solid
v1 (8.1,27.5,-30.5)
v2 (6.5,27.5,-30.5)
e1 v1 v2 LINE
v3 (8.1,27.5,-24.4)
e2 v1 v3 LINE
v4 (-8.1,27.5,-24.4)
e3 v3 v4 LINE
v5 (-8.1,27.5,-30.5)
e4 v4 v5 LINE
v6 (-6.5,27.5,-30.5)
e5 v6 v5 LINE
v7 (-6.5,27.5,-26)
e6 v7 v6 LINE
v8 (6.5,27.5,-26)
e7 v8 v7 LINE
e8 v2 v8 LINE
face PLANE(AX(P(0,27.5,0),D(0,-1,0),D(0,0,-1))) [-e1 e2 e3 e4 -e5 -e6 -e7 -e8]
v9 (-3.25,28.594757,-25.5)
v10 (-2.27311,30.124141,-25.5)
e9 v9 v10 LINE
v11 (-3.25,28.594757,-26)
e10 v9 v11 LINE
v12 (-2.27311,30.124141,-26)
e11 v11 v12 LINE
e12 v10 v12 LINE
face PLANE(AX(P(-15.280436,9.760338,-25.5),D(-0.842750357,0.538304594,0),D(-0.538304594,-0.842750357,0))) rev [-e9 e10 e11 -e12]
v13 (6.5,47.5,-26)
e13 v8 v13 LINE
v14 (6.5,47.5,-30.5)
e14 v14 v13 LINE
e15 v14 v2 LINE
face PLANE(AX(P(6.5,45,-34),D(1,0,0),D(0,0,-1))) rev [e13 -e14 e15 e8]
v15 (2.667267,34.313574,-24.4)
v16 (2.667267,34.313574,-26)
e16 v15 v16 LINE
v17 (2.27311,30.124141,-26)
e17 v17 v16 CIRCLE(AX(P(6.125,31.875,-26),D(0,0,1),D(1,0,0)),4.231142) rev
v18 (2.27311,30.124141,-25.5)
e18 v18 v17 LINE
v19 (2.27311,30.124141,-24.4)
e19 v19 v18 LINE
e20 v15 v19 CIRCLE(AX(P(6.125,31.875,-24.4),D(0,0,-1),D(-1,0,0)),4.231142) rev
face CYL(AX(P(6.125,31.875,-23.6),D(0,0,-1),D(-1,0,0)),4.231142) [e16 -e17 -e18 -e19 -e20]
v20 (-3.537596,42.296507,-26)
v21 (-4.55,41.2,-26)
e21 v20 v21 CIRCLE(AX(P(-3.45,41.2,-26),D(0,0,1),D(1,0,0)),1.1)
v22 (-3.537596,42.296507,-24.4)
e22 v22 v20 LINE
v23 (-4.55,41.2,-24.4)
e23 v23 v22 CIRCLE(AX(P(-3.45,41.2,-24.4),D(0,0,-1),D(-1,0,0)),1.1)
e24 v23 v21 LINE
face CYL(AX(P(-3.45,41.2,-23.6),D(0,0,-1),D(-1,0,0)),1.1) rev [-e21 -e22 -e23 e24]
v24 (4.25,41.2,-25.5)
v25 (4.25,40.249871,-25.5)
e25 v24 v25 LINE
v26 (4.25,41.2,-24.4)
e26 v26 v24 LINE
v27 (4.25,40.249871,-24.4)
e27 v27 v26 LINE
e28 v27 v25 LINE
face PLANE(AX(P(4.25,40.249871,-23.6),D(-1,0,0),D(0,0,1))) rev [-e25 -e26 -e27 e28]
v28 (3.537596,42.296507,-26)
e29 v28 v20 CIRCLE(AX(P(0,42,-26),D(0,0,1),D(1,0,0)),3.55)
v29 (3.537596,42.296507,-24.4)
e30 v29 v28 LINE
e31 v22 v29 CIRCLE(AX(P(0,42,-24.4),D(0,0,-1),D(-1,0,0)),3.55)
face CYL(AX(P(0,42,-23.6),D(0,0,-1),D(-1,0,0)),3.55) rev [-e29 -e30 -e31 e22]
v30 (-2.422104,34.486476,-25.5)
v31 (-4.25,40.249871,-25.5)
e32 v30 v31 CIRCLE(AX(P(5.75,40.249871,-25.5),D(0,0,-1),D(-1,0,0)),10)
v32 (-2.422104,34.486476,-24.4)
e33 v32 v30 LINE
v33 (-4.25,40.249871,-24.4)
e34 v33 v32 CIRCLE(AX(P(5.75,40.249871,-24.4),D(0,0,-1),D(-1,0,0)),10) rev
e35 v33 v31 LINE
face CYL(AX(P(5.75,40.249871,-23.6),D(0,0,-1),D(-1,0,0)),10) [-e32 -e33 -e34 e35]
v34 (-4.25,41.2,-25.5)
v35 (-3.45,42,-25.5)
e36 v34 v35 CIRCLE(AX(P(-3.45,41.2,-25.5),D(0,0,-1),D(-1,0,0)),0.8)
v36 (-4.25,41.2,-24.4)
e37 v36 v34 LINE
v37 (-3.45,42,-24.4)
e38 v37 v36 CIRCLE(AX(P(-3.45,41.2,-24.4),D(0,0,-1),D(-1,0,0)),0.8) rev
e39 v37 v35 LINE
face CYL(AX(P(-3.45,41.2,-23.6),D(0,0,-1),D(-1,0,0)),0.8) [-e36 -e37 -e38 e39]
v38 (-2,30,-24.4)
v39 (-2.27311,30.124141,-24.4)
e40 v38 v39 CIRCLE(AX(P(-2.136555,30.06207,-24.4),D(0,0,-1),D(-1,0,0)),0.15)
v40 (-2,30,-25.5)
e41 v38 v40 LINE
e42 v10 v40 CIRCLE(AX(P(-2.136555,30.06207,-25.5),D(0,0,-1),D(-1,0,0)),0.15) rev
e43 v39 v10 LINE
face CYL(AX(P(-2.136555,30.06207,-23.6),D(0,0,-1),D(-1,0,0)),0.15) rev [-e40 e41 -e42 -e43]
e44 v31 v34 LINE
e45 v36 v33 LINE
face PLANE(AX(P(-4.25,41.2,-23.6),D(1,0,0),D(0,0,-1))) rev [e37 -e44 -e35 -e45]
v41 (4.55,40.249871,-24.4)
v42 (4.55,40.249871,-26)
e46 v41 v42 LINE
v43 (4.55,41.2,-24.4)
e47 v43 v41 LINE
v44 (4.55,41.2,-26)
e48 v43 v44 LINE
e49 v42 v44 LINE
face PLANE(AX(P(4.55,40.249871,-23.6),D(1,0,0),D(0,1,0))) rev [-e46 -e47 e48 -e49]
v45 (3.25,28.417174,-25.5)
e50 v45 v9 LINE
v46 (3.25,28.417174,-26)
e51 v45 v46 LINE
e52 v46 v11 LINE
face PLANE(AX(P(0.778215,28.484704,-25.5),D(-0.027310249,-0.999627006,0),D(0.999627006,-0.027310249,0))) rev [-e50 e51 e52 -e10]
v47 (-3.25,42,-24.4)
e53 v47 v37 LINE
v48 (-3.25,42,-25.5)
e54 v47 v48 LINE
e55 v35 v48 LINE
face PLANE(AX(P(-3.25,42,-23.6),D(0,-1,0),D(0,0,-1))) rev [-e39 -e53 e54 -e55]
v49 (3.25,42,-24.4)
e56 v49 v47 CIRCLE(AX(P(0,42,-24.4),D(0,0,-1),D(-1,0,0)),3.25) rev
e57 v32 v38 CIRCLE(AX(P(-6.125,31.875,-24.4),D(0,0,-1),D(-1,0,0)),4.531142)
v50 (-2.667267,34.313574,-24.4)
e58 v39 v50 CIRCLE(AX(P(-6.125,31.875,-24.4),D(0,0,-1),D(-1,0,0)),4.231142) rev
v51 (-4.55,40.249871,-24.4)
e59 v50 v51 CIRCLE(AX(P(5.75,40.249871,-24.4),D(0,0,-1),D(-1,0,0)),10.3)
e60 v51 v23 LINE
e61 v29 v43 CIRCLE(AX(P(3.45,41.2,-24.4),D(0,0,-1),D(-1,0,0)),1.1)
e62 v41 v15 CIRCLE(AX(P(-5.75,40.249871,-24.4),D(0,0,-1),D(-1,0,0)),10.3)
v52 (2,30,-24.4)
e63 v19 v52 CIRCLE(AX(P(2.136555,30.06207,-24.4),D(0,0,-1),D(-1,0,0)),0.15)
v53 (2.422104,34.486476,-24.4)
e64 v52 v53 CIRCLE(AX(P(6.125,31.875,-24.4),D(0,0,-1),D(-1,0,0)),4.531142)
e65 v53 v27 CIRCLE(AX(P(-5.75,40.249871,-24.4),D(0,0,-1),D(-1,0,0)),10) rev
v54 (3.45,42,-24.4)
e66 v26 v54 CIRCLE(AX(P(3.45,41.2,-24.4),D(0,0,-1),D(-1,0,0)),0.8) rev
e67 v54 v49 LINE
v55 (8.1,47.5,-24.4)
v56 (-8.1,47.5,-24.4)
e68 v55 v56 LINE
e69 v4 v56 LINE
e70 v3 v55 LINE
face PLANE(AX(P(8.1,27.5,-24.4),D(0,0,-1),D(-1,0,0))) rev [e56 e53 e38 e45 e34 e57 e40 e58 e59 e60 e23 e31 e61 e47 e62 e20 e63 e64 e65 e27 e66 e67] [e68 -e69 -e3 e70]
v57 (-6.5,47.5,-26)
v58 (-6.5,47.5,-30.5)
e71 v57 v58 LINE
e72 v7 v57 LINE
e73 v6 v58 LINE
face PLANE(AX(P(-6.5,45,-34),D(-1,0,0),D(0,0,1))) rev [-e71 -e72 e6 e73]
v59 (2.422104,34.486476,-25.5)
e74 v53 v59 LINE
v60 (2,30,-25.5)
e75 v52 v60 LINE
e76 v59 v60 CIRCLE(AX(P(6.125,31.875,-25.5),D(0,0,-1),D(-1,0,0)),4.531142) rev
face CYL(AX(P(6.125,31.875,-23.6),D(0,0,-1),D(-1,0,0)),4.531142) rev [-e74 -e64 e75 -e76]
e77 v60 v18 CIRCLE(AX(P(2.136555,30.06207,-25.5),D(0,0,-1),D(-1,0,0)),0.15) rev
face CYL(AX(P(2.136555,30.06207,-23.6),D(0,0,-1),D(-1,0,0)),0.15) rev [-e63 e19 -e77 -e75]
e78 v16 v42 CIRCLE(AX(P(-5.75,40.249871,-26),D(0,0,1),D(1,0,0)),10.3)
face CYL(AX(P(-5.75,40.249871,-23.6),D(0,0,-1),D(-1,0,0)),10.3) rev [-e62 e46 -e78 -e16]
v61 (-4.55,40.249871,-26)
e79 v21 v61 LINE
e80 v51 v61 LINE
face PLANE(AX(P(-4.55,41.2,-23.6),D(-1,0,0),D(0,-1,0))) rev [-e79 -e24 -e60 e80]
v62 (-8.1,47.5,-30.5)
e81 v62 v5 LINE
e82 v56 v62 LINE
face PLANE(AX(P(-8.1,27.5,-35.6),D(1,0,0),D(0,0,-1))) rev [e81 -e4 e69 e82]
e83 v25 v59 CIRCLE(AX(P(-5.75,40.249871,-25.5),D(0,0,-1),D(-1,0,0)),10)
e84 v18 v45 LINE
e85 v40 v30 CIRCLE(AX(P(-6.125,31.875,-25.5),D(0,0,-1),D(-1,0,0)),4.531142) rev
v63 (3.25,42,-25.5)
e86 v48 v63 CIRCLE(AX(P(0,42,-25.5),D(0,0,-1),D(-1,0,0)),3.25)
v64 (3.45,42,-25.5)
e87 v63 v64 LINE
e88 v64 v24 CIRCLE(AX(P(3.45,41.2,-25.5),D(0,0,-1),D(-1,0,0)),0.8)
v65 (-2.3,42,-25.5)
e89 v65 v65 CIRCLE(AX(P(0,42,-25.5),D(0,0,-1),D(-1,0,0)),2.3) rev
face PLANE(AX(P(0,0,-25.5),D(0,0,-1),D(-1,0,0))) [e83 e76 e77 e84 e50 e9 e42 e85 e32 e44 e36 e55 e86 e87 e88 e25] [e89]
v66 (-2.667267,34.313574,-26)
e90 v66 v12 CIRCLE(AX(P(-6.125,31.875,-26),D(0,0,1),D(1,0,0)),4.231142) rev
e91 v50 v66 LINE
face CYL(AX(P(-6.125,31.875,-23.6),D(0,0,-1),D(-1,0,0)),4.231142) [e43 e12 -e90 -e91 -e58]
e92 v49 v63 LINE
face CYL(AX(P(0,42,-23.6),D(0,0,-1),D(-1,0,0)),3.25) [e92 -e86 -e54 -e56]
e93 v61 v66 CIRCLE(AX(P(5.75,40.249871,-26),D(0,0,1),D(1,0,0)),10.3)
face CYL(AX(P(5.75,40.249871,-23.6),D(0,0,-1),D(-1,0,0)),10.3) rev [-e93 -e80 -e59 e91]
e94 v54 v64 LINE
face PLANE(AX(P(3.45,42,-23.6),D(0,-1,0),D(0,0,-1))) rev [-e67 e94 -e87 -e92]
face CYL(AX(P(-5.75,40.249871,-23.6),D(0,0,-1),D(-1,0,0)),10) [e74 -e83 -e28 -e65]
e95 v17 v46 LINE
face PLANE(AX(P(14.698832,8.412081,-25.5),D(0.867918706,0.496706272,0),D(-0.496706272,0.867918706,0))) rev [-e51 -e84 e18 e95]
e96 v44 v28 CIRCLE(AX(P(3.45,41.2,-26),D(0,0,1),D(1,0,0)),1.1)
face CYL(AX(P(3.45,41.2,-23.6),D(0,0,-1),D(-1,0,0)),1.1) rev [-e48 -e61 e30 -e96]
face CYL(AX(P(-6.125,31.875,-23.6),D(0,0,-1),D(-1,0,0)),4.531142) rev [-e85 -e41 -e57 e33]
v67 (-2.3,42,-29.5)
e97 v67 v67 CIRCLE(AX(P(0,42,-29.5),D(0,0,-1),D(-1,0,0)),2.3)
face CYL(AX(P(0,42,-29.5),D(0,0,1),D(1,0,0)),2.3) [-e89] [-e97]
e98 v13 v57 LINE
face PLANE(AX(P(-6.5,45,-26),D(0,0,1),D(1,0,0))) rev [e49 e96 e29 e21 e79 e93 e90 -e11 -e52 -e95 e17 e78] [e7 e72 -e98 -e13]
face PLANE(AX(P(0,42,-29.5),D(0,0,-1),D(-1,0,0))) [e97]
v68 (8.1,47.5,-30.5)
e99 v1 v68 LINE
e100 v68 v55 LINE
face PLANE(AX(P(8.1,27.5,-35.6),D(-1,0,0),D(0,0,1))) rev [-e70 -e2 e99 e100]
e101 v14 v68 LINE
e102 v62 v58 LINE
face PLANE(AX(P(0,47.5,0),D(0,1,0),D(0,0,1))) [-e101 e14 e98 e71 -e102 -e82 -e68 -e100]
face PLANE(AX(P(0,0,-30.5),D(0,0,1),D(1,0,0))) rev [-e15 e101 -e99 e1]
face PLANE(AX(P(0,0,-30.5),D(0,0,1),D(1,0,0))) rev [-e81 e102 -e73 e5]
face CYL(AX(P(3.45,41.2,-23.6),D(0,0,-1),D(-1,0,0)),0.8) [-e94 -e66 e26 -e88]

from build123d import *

# Parameters (mm, degrees)
CUT_EXTRUDE1_DEPTH     = 5
CUT_EXTRUDE3_DEPTH     = 45
SKETCH8_R              = 40
CUT_EXTRUDE4_DEPTH     = 32
FILLET1_R              = 7
FILLET2_R              = 8
CUT_REVOLVE1_START     = 17
CUT_REVOLVE1_DEPTH     = 30.5
SKETCH18_W             = 13
SKETCH18_H             = 8
CUT_EXTRUDE13_DEPTH    = 5
SKETCH20_W             = 84
SKETCH20_H             = 7
CUT_EXTRUDE15_DEPTH    = 5
SKETCH19_R             = 1.5
CUT_EXTRUDE14_DEPTH    = 12
FILLET3_R              = 4
SKETCH21_W             = 16
SKETCH21_H             = 5
CUT_EXTRUDE16_DEPTH    = 5
CIRPATTERN1_COUNT      = 4
SKETCH22_W             = 5
SKETCH22_H             = 12
BOSS_EXTRUDE1_DEPTH    = 1.5
SKETCH23_W             = 5
SKETCH23_H             = 4.4
SKETCH23_H_2           = 4
BOSS_EXTRUDE2_DEPTH    = 17
SKETCH24_W             = 2
SKETCH24_H             = 3
BOSS_EXTRUDE3_DEPTH    = 2
CIRPATTERN2_COUNT      = 5
CUT_REVOLVE2_START     = 17
CUT_REVOLVE2_DEPTH     = 30.5
SKETCH29_W             = 16.2
SKETCH29_H             = 11.2
SKETCH29_W_2           = 13
SKETCH29_H_2           = 8
BOSS_EXTRUDE4_DEPTH    = 20
CUT_EXTRUDE18_DEPTH    = 12
SKETCH34_R             = 2.3
BOSS_EXTRUDE5_DEPTH    = 3.5
BOSS_EXTRUDE6_START    = 3.5
SKETCH35_R             = 2.3
BOSS_EXTRUDE6_DEPTH    = 3.5
SKETCH36_W             = 2
SKETCH36_H             = 2
BOSS_EXTRUDE7_DEPTH    = 5
SKETCH37_W             = 2
SKETCH37_H             = 2
BOSS_EXTRUDE8_DEPTH    = 12.5
SKETCH40_W             = 2
SKETCH40_H             = 2
BOSS_EXTRUDE9_DEPTH    = 5
INTERSECT5_OUTLINE_R   = 42
INTERSECT5_DEPTH       = 55
INTERSECT5_2_OUTLINE_W = 16
INTERSECT5_2_OUTLINE_H = 5
INTERSECT5_2_DEPTH     = 15.5
INTERSECT5_START       = 47.5
INTERSECT5_3_OUTLINE_W = 13
INTERSECT5_3_OUTLINE_H = 8
INTERSECT5_3_DEPTH     = 2.5
INTERSECT6_START       = -35.6
INTERSECT6_OUTLINE_W   = 16.2
INTERSECT6_OUTLINE_H   = 20
INTERSECT6_DEPTH       = 5.1
SKETCH46_R             = 2.3
CUT_EXTRUDE20_DEPTH    = 0.5


# Read off the part's stored shape, not the designer's step: Cut-Revolve1, Cut-Revolve2, Intersect5, Intersect6
with BuildPart() as part:
    # Sketch1 → Revolve1 (revolve)
    with BuildSketch(Plane.XY, mode=Mode.PRIVATE) as revolve1_sk:
        with BuildLine():
            Line((37, 55), (0, 55))
            Line((0, 55), (0, 11.5))
            Line((0, 11.5), (22.5, 11.5))
            Line((22.5, 11.5), (22.5, 0))
            Line((22.5, 0), (25, 0))
            Line((25, 0), (25, 11.5))
            Line((25, 11.5), (42, 11.5))
            Line((42, 11.5), (42, 50))
            ThreePointArc((42, 50), (40.535533906, 53.535533906), (37, 55))
        make_face()
    revolve(revolve1_sk.sketch.rotate(Axis((0, 2, 0), (0, 1, 0)), 90), axis=Axis((0, 2, 0), (0, 1, 0)))

    # Sketch5 → Cut-Extrude1 (cut)
    with BuildSketch(Plane(origin=(0, 55, 0), x_dir=(1, 0, 0), z_dir=(0, 1, 0))):
        with BuildLine():
            Line((-42, 0), (-40, 0))
            Line((-40, 0), (40, 0))
            Line((40, 0), (42, 0))
            ThreePointArc((42, 0), (0, 42), (-42, 0))
        make_face()
    extrude(amount=-CUT_EXTRUDE1_DEPTH, mode=Mode.SUBTRACT)

    # Sketch7 → Cut-Extrude3 (cut)
    with BuildSketch(Plane.XZ.offset(-11.5)):
        with BuildLine():
            Line((-21, 0), (21, 0))
            ThreePointArc((21, 0), (0, -21), (-21, 0))
        make_face()
    extrude(amount=-CUT_EXTRUDE3_DEPTH, mode=Mode.SUBTRACT)

    # Sketch8 → Cut-Extrude4 (cut)
    with BuildSketch(Plane(origin=(0, 47.5, 0), x_dir=(1, 0, 0), z_dir=(0, 1, 0))):
        with Locations(Location((0, 0, 0), (0, 0, 270))):
            Circle(SKETCH8_R)
        with BuildLine():
            Line((22.912878475, -2), (-22.912878475, -2))
            ThreePointArc((-22.912878475, -2), (0, 23), (22.912878475, -2))
        make_face(mode=Mode.SUBTRACT)
    extrude(amount=-CUT_EXTRUDE4_DEPTH, mode=Mode.SUBTRACT)

    # Fillet1
    fillet1_edges = [part.edges().sort_by_distance(p)[0] for p in [
        (21, 30.75, 0),
        (-21, 30.75, 0),
    ]]
    fillet(fillet1_edges, radius=FILLET1_R)

    # Fillet2
    fillet2_edges = [part.edges().sort_by_distance(p)[0] for p in [
        (-22.912878475, 31.5, 2),
        (22.912878475, 31.5, 2),
    ]]
    fillet(fillet2_edges, radius=FILLET2_R)

    # Cut-Revolve1 outline → Cut-Revolve1 (cut)
    with BuildSketch(Plane(origin=(0, 0, 0), x_dir=(1, 0, 0), z_dir=(0, 1, 0)).offset(CUT_REVOLVE1_START)):
        with BuildLine():
            Line((-34.641016151, -20), (-36.373066959, -21))
            ThreePointArc((-36.373066959, -21), (0, -42), (36.373066959, -21))
            Line((36.373066959, -21), (34.641016151, -20))
            ThreePointArc((34.641016151, -20), (0, -40), (-34.641016151, -20))
        make_face()
    extrude(amount=CUT_REVOLVE1_DEPTH, mode=Mode.SUBTRACT)

    # Sketch18 → Cut-Extrude13 (cut)
    with BuildSketch(Plane(origin=(0, 50, 0), x_dir=(1, 0, 0), z_dir=(0, 1, 0))):
        with Locations((0, 30)):
            Rectangle(SKETCH18_W, SKETCH18_H)
    extrude(amount=-CUT_EXTRUDE13_DEPTH, mode=Mode.SUBTRACT)

    # Sketch20 → Cut-Extrude15 (cut)
    with BuildSketch(Plane(origin=(0, 55, 0), x_dir=(1, 0, 0), z_dir=(0, 1, 0))):
        with Locations((0, -3.5)):
            Rectangle(SKETCH20_W, SKETCH20_H)
    extrude(amount=-CUT_EXTRUDE15_DEPTH, mode=Mode.SUBTRACT)

    # Sketch19 → Cut-Extrude14 (cut)
    with BuildSketch(Plane(origin=(0, 0, 7), x_dir=(-1, 0, 0), z_dir=(0, 0, -1))):
        with Locations((0, 52.5)):
            Circle(SKETCH19_R)
        with Locations((-29.412558482, 52.5)):
            Circle(SKETCH19_R)
        with Locations((29.412558482, 52.5)):
            Circle(SKETCH19_R)
    extrude(amount=-CUT_EXTRUDE14_DEPTH, mode=Mode.SUBTRACT)

    # Fillet3
    fillet3_edges = [part.edges().sort_by_distance(p)[0] for p in [
        (0, 11.5, 42),
    ]]
    fillet(fillet3_edges, radius=FILLET3_R)

    # Sketch21 → Cut-Extrude16 (cut)
    with BuildSketch(Plane(origin=(0, 15.5, 0), x_dir=(1, 0, 0), z_dir=(0, 1, 0))):
        with Locations((0, -29.5)):
            Rectangle(SKETCH21_W, SKETCH21_H)
    cut_extrude16 = extrude(amount=-CUT_EXTRUDE16_DEPTH, mode=Mode.SUBTRACT)

    # CirPattern1: Cut-Extrude16 ×4 about axis
    cirpattern1_axis = Axis((0, 0, 0), (0, 1, 0))
    for i in range(1, CIRPATTERN1_COUNT):
        add(cut_extrude16.rotate(cirpattern1_axis, i * 360 / CIRPATTERN1_COUNT), mode=Mode.SUBTRACT)

    # Sketch22 → Boss-Extrude1 (add)
    with BuildSketch(Plane(origin=(0, 15.5, 0), x_dir=(1, 0, 0), z_dir=(0, 1, 0))):
        with Locations((35.5, -4)):
            Rectangle(SKETCH22_W, SKETCH22_H)
    extrude(amount=BOSS_EXTRUDE1_DEPTH)

    # Sketch23 → Boss-Extrude2 (add)
    with BuildSketch(Plane(origin=(0, 17, 0), x_dir=(1, 0, 0), z_dir=(0, 1, 0))):
        with Locations((35.5, -0.2)):
            Rectangle(SKETCH23_W, SKETCH23_H)
        with Locations((35.5, -8)):
            Rectangle(SKETCH23_W, SKETCH23_H_2)
    extrude(amount=BOSS_EXTRUDE2_DEPTH)

    # Sketch24 → Boss-Extrude3 (add)
    with BuildSketch(Plane.XZ):
        with Locations((0, -22.5)):
            Rectangle(SKETCH24_W, SKETCH24_H)
    boss_extrude3 = extrude(amount=-BOSS_EXTRUDE3_DEPTH)

    # CirPattern2: Boss-Extrude3 ×5 about axis
    cirpattern2_axis = Axis((0, 0, 0), (0, 1, 0))
    for i in range(1, CIRPATTERN2_COUNT):
        add(boss_extrude3.rotate(cirpattern2_axis, i * 360 / CIRPATTERN2_COUNT))

    # Cut-Revolve2 outline → Cut-Revolve2 (cut)
    with BuildSketch(Plane(origin=(0, 0, 0), x_dir=(1, 0, 0), z_dir=(0, 1, 0)).offset(CUT_REVOLVE2_START)):
        with BuildLine():
            ThreePointArc((-30.641777725, 25.711504387), (0, 40), (30.641777725, 25.711504387))
            Line((30.641777725, 25.711504387), (32.173866611, 26.997079607))
            ThreePointArc((32.173866611, 26.997079607), (0, 42), (-32.173866611, 26.997079607))
            Line((-32.173866611, 26.997079607), (-30.641777725, 25.711504387))
        make_face()
    extrude(amount=CUT_REVOLVE2_DEPTH, mode=Mode.SUBTRACT)

    # Sketch29 → Boss-Extrude4 (add)
    with BuildSketch(Plane.XZ.offset(-47.5)):
        with Locations((0, -30)):
            Rectangle(SKETCH29_W, SKETCH29_H)
        with Locations((0, -30)):
            Rectangle(SKETCH29_W_2, SKETCH29_H_2, mode=Mode.SUBTRACT)
    extrude(amount=BOSS_EXTRUDE4_DEPTH)

    # Sketch32 → Cut-Extrude18 (cut)
    with BuildSketch(Plane(origin=(0, 0, -35.6), x_dir=(-1, 0, 0), z_dir=(0, 0, -1))):
        with BuildLine():
            Line((-4.55, 40.24987133), (-4.55, 41.2))
            ThreePointArc((-4.55, 41.2), (-4.258194078, 41.946205288), (-3.537595761, 42.296506718))
            ThreePointArc((-3.537595761, 42.296506718), (0, 45.55), (3.537595761, 42.296506718))
            ThreePointArc((3.537595761, 42.296506718), (4.258194078, 41.946205288), (4.55, 41.2))
            Line((4.55, 41.2), (4.55, 40.24987133))
            ThreePointArc((4.55, 40.24987133), (4.068040722, 37.136018992), (2.667266721, 34.313574426))
            ThreePointArc((2.667266721, 34.313574426), (1.91246078, 32.271330642), (2.273109943, 30.124140883))
            ThreePointArc((2.273109943, 30.124140883), (2.198625413, 29.92551547), (2, 30))
            ThreePointArc((2, 30), (1.613779787, 32.29943161), (2.422103613, 34.486476277))
            ThreePointArc((2.422103613, 34.486476277), (3.782078371, 37.22671372), (4.25, 40.24987133))
            Line((4.25, 40.24987133), (4.25, 41.2))
            ThreePointArc((4.25, 41.2), (4.015685425, 41.765685425), (3.45, 42))
            Line((3.45, 42), (3.25, 42))
            ThreePointArc((3.25, 42), (0, 45.25), (-3.25, 42))
            Line((-3.25, 42), (-3.45, 42))
            ThreePointArc((-3.45, 42), (-4.015685425, 41.765685425), (-4.25, 41.2))
            Line((-4.25, 41.2), (-4.25, 40.24987133))
            ThreePointArc((-4.25, 40.24987133), (-3.782078371, 37.22671372), (-2.422103613, 34.486476277))
            ThreePointArc((-2.422103613, 34.486476277), (-1.613779787, 32.29943161), (-2, 30))
            ThreePointArc((-2, 30), (-2.198625413, 29.92551547), (-2.273109943, 30.124140883))
            ThreePointArc((-2.273109943, 30.124140883), (-1.91246078, 32.271330642), (-2.667266721, 34.313574426))
            ThreePointArc((-2.667266721, 34.313574426), (-4.068040722, 37.136018992), (-4.55, 40.24987133))
        make_face()
    extrude(amount=-CUT_EXTRUDE18_DEPTH, mode=Mode.SUBTRACT)

    # Sketch34 → Boss-Extrude5 (add)
    with BuildSketch(Plane.XY.offset(-34)):
        with Locations(Location((0, 42, 0), (0, 0, 180))):
            Circle(SKETCH34_R)
    extrude(amount=BOSS_EXTRUDE5_DEPTH)

    # Sketch35 → Boss-Extrude6 (add)
    with BuildSketch(Plane(origin=(0, 0, -26), x_dir=(-1, 0, 0), z_dir=(0, 0, -1)).offset(BOSS_EXTRUDE6_START)):
        with Locations((0, 42)):
            Circle(SKETCH35_R)
    extrude(amount=-BOSS_EXTRUDE6_DEPTH)

    # Sketch36 → Boss-Extrude7 (add)
    with BuildSketch(Plane(origin=(0, 0, -35.6), x_dir=(-1, 0, 0), z_dir=(0, 0, -1))):
        with Locations((-6.159647943, 37.918102195)):
            Rectangle(SKETCH36_W, SKETCH36_H)
    extrude(amount=BOSS_EXTRUDE7_DEPTH)

    # Sketch37 → Boss-Extrude8 (add)
    with BuildSketch(Plane.ZY.offset(-5.159647943)):
        with Locations((-39.597351245, 37.918102195)):
            Rectangle(SKETCH37_W, SKETCH37_H)
    extrude(amount=BOSS_EXTRUDE8_DEPTH)

    # Sketch40 → Boss-Extrude9 (add)
    with BuildSketch(Plane(origin=(0, 0, -35.6), x_dir=(-1, 0, 0), z_dir=(0, 0, -1))):
        with Locations((6.340352057, 37.918102195)):
            Rectangle(SKETCH40_W, SKETCH40_H)
    extrude(amount=BOSS_EXTRUDE9_DEPTH)

    # Intersect5 outline → Intersect5 (cut)
    with BuildSketch(Plane(origin=(0, 0, 0), x_dir=(1, 0, 0), z_dir=(0, 1, 0))):
        Circle(INTERSECT5_OUTLINE_R)
        with BuildLine():
            Line((-7.340352057, 39.320722675), (-7.340352057, 35.6))
            Line((-7.340352057, 35.6), (7.159647943, 35.6))
            Line((7.159647943, 35.6), (7.159647943, 39.354027003))
            ThreePointArc((7.159647943, 39.354027003), (32.84390905, 22.831505389), (39.382737335, -7))
            Line((39.382737335, -7), (38, -7))
            Line((38, -7), (38, 2))
            Line((38, 2), (33, 2))
            Line((33, 2), (33, -7))
            Line((33, -7), (32, -7))
            Line((32, -7), (32, 8))
            Line((32, 8), (27, 8))
            Line((27, 8), (27, -7))
            Line((27, -7), (21.38340478, -7))
            ThreePointArc((21.38340478, -7), (22.491014191, -0.635830699), (21.744722088, 5.780749199))
            ThreePointArc((21.744722088, 5.780749199), (21.600641781, 7.527000579), (21.079848197, 9.2))
            ThreePointArc((21.079848197, 9.2), (0, 23), (-21.079848197, 9.2))
            ThreePointArc((-21.079848197, 9.2), (-21.600641781, 7.527000579), (-21.744722088, 5.780749199))
            ThreePointArc((-21.744722088, 5.780749199), (-22.491014191, -0.635830699), (-21.38340478, -7))
            Line((-21.38340478, -7), (-27, -7))
            Line((-27, -7), (-27, 8))
            Line((-27, 8), (-32, 8))
            Line((-32, 8), (-32, -7))
            Line((-32, -7), (-39.382737335, -7))
            ThreePointArc((-39.382737335, -7), (-32.896262825, 22.756007825), (-7.340352057, 39.320722675))
        make_face(mode=Mode.SUBTRACT)
        with BuildLine():
            Line((12.124355653, 0), (-12.124355653, 0))
            ThreePointArc((-12.124355653, 0), (-18.186533479, 3.5), (-18.186533479, 10.5))
            ThreePointArc((-18.186533479, 10.5), (0, 21), (18.186533479, 10.5))
            ThreePointArc((18.186533479, 10.5), (18.186533479, 3.5), (12.124355653, 0))
        make_face(mode=Mode.SUBTRACT)
    extrude(amount=INTERSECT5_DEPTH, mode=Mode.SUBTRACT)

    # Intersect5 2 outline → Intersect5 2 (cut)
    with BuildSketch(Plane(origin=(0, 0, 0), x_dir=(1, 0, 0), z_dir=(0, 1, 0))):
        with BuildLine():
            Line((-7.340352057, 35.6), (-7.340352057, 39.320722675))
            ThreePointArc((-7.340352057, 39.320722675), (-32.896262825, 22.756007825), (-39.382737335, -7))
            Line((-39.382737335, -7), (-32, -7))
            Line((-32, -7), (-32, 8))
            Line((-32, 8), (-27, 8))
            Line((-27, 8), (-27, -7))
            Line((-27, -7), (-21.38340478, -7))
            ThreePointArc((-21.38340478, -7), (-22.491014191, -0.635830699), (-21.744722088, 5.780749199))
            ThreePointArc((-21.744722088, 5.780749199), (-21.600641781, 7.527000579), (-21.079848197, 9.2))
            ThreePointArc((-21.079848197, 9.2), (0, 23), (21.079848197, 9.2))
            ThreePointArc((21.079848197, 9.2), (21.600641781, 7.527000579), (21.744722088, 5.780749199))
            ThreePointArc((21.744722088, 5.780749199), (22.491014191, -0.635830699), (21.38340478, -7))
            Line((21.38340478, -7), (27, -7))
            Line((27, -7), (27, 8))
            Line((27, 8), (32, 8))
            Line((32, 8), (32, -7))
            Line((32, -7), (33, -7))
            Line((33, -7), (33, 2))
            Line((33, 2), (38, 2))
            Line((38, 2), (38, -7))
            Line((38, -7), (39.382737335, -7))
            ThreePointArc((39.382737335, -7), (32.84390905, 22.831505389), (7.159647943, 39.354027003))
            Line((7.159647943, 39.354027003), (7.159647943, 35.6))
            Line((7.159647943, 35.6), (-7.340352057, 35.6))
        make_face()
        with Locations((0, 29.5)):
            Rectangle(INTERSECT5_2_OUTLINE_W, INTERSECT5_2_OUTLINE_H, mode=Mode.SUBTRACT)
    extrude(amount=INTERSECT5_2_DEPTH, mode=Mode.SUBTRACT)

    # Intersect5 3 outline → Intersect5 3 (cut)
    with BuildSketch(Plane(origin=(0, 0, 0), x_dir=(1, 0, 0), z_dir=(0, 1, 0)).offset(INTERSECT5_START)):
        with BuildLine():
            Line((-7.340352057, 35.6), (-7.340352057, 39.320722675))
            ThreePointArc((-7.340352057, 39.320722675), (-32.896262825, 22.756007825), (-39.382737335, -7))
            Line((-39.382737335, -7), (-32, -7))
            Line((-32, -7), (-32, 8))
            Line((-32, 8), (-27, 8))
            Line((-27, 8), (-27, -7))
            Line((-27, -7), (-21.38340478, -7))
            ThreePointArc((-21.38340478, -7), (-22.491014191, -0.635830699), (-21.744722088, 5.780749199))
            ThreePointArc((-21.744722088, 5.780749199), (-21.600641781, 7.527000579), (-21.079848197, 9.2))
            ThreePointArc((-21.079848197, 9.2), (0, 23), (21.079848197, 9.2))
            ThreePointArc((21.079848197, 9.2), (21.600641781, 7.527000579), (21.744722088, 5.780749199))
            ThreePointArc((21.744722088, 5.780749199), (22.491014191, -0.635830699), (21.38340478, -7))
            Line((21.38340478, -7), (27, -7))
            Line((27, -7), (27, 8))
            Line((27, 8), (32, 8))
            Line((32, 8), (32, -7))
            Line((32, -7), (33, -7))
            Line((33, -7), (33, 2))
            Line((33, 2), (38, 2))
            Line((38, 2), (38, -7))
            Line((38, -7), (39.382737335, -7))
            ThreePointArc((39.382737335, -7), (32.84390905, 22.831505389), (7.159647943, 39.354027003))
            Line((7.159647943, 39.354027003), (7.159647943, 35.6))
            Line((7.159647943, 35.6), (-7.340352057, 35.6))
        make_face()
        with Locations((0, 30)):
            Rectangle(INTERSECT5_3_OUTLINE_W, INTERSECT5_3_OUTLINE_H, mode=Mode.SUBTRACT)
    extrude(amount=INTERSECT5_3_DEPTH, mode=Mode.SUBTRACT)

    # Intersect6 outline → Intersect6 (cut)
    with BuildSketch(Plane.XY.offset(INTERSECT6_START)):
        with Locations((0, 37.5)):
            Rectangle(INTERSECT6_OUTLINE_W, INTERSECT6_OUTLINE_H)
        with BuildLine():
            ThreePointArc((4.25, 41.2), (4.015685425, 41.765685425), (3.45, 42))
            Line((3.45, 42), (3.25, 42))
            ThreePointArc((3.25, 42), (0, 45.25), (-3.25, 42))
            Line((-3.25, 42), (-3.45, 42))
            ThreePointArc((-3.45, 42), (-4.015685425, 41.765685425), (-4.25, 41.2))
            Line((-4.25, 41.2), (-4.25, 40.24987133))
            ThreePointArc((-4.25, 40.24987133), (-3.782078371, 37.22671372), (-2.422103613, 34.486476277))
            ThreePointArc((-2.422103613, 34.486476277), (-1.613779787, 32.29943161), (-2, 30))
            ThreePointArc((-2, 30), (-2.198625413, 29.92551547), (-2.273109943, 30.124140883))
            ThreePointArc((-2.273109943, 30.124140883), (-1.91246078, 32.271330642), (-2.667266721, 34.313574426))
            ThreePointArc((-2.667266721, 34.313574426), (-4.068040722, 37.136018992), (-4.55, 40.24987133))
            Line((-4.55, 40.24987133), (-4.55, 41.2))
            ThreePointArc((-4.55, 41.2), (-4.258194078, 41.946205288), (-3.537595761, 42.296506718))
            ThreePointArc((-3.537595761, 42.296506718), (0, 45.55), (3.537595761, 42.296506718))
            ThreePointArc((3.537595761, 42.296506718), (4.258194078, 41.946205288), (4.55, 41.2))
            Line((4.55, 41.2), (4.55, 40.24987133))
            ThreePointArc((4.55, 40.24987133), (4.068040722, 37.136018992), (2.667266721, 34.313574426))
            ThreePointArc((2.667266721, 34.313574426), (1.91246078, 32.271330642), (2.273109943, 30.124140883))
            ThreePointArc((2.273109943, 30.124140883), (2.198625413, 29.92551547), (2, 30))
            ThreePointArc((2, 30), (1.613779787, 32.29943161), (2.422103613, 34.486476277))
            ThreePointArc((2.422103613, 34.486476277), (3.782078371, 37.22671372), (4.25, 40.24987133))
            Line((4.25, 40.24987133), (4.25, 41.2))
        make_face(mode=Mode.SUBTRACT)
    extrude(amount=INTERSECT6_DEPTH, mode=Mode.SUBTRACT)

    # Sketch46 → Cut-Extrude20 (cut)
    with BuildSketch(Plane(origin=(0, 0, -26), x_dir=(-1, 0, 0), z_dir=(0, 0, -1))):
        with BuildLine():
            Line((-3.25, 28.417174007), (3.25, 28.594756863))
            Line((3.25, 28.594756863), (2.273109943, 30.124140883))
            ThreePointArc((2.273109943, 30.124140883), (2.198625413, 29.92551547), (2, 30))
            ThreePointArc((2, 30), (1.613779787, 32.29943161), (2.422103613, 34.486476277))
            ThreePointArc((2.422103613, 34.486476277), (3.782078371, 37.22671372), (4.25, 40.24987133))
            Line((4.25, 40.24987133), (4.25, 41.2))
            ThreePointArc((4.25, 41.2), (4.015685425, 41.765685425), (3.45, 42))
            Line((3.45, 42), (3.25, 42))
            ThreePointArc((3.25, 42), (0, 45.25), (-3.25, 42))
            Line((-3.25, 42), (-3.45, 42))
            ThreePointArc((-3.45, 42), (-4.015685425, 41.765685425), (-4.25, 41.2))
            Line((-4.25, 41.2), (-4.25, 40.24987133))
            ThreePointArc((-4.25, 40.24987133), (-3.782078371, 37.22671372), (-2.422103613, 34.486476277))
            ThreePointArc((-2.422103613, 34.486476277), (-1.613779787, 32.29943161), (-2, 30))
            ThreePointArc((-2, 30), (-2.198625413, 29.92551547), (-2.273109943, 30.124140883))
            Line((-2.273109943, 30.124140883), (-3.25, 28.417174007))
        make_face()
        with Locations((0, 42)):
            Circle(SKETCH46_R, mode=Mode.SUBTRACT)
    extrude(amount=-CUT_EXTRUDE20_DEPTH, mode=Mode.SUBTRACT)


solid = part.part
